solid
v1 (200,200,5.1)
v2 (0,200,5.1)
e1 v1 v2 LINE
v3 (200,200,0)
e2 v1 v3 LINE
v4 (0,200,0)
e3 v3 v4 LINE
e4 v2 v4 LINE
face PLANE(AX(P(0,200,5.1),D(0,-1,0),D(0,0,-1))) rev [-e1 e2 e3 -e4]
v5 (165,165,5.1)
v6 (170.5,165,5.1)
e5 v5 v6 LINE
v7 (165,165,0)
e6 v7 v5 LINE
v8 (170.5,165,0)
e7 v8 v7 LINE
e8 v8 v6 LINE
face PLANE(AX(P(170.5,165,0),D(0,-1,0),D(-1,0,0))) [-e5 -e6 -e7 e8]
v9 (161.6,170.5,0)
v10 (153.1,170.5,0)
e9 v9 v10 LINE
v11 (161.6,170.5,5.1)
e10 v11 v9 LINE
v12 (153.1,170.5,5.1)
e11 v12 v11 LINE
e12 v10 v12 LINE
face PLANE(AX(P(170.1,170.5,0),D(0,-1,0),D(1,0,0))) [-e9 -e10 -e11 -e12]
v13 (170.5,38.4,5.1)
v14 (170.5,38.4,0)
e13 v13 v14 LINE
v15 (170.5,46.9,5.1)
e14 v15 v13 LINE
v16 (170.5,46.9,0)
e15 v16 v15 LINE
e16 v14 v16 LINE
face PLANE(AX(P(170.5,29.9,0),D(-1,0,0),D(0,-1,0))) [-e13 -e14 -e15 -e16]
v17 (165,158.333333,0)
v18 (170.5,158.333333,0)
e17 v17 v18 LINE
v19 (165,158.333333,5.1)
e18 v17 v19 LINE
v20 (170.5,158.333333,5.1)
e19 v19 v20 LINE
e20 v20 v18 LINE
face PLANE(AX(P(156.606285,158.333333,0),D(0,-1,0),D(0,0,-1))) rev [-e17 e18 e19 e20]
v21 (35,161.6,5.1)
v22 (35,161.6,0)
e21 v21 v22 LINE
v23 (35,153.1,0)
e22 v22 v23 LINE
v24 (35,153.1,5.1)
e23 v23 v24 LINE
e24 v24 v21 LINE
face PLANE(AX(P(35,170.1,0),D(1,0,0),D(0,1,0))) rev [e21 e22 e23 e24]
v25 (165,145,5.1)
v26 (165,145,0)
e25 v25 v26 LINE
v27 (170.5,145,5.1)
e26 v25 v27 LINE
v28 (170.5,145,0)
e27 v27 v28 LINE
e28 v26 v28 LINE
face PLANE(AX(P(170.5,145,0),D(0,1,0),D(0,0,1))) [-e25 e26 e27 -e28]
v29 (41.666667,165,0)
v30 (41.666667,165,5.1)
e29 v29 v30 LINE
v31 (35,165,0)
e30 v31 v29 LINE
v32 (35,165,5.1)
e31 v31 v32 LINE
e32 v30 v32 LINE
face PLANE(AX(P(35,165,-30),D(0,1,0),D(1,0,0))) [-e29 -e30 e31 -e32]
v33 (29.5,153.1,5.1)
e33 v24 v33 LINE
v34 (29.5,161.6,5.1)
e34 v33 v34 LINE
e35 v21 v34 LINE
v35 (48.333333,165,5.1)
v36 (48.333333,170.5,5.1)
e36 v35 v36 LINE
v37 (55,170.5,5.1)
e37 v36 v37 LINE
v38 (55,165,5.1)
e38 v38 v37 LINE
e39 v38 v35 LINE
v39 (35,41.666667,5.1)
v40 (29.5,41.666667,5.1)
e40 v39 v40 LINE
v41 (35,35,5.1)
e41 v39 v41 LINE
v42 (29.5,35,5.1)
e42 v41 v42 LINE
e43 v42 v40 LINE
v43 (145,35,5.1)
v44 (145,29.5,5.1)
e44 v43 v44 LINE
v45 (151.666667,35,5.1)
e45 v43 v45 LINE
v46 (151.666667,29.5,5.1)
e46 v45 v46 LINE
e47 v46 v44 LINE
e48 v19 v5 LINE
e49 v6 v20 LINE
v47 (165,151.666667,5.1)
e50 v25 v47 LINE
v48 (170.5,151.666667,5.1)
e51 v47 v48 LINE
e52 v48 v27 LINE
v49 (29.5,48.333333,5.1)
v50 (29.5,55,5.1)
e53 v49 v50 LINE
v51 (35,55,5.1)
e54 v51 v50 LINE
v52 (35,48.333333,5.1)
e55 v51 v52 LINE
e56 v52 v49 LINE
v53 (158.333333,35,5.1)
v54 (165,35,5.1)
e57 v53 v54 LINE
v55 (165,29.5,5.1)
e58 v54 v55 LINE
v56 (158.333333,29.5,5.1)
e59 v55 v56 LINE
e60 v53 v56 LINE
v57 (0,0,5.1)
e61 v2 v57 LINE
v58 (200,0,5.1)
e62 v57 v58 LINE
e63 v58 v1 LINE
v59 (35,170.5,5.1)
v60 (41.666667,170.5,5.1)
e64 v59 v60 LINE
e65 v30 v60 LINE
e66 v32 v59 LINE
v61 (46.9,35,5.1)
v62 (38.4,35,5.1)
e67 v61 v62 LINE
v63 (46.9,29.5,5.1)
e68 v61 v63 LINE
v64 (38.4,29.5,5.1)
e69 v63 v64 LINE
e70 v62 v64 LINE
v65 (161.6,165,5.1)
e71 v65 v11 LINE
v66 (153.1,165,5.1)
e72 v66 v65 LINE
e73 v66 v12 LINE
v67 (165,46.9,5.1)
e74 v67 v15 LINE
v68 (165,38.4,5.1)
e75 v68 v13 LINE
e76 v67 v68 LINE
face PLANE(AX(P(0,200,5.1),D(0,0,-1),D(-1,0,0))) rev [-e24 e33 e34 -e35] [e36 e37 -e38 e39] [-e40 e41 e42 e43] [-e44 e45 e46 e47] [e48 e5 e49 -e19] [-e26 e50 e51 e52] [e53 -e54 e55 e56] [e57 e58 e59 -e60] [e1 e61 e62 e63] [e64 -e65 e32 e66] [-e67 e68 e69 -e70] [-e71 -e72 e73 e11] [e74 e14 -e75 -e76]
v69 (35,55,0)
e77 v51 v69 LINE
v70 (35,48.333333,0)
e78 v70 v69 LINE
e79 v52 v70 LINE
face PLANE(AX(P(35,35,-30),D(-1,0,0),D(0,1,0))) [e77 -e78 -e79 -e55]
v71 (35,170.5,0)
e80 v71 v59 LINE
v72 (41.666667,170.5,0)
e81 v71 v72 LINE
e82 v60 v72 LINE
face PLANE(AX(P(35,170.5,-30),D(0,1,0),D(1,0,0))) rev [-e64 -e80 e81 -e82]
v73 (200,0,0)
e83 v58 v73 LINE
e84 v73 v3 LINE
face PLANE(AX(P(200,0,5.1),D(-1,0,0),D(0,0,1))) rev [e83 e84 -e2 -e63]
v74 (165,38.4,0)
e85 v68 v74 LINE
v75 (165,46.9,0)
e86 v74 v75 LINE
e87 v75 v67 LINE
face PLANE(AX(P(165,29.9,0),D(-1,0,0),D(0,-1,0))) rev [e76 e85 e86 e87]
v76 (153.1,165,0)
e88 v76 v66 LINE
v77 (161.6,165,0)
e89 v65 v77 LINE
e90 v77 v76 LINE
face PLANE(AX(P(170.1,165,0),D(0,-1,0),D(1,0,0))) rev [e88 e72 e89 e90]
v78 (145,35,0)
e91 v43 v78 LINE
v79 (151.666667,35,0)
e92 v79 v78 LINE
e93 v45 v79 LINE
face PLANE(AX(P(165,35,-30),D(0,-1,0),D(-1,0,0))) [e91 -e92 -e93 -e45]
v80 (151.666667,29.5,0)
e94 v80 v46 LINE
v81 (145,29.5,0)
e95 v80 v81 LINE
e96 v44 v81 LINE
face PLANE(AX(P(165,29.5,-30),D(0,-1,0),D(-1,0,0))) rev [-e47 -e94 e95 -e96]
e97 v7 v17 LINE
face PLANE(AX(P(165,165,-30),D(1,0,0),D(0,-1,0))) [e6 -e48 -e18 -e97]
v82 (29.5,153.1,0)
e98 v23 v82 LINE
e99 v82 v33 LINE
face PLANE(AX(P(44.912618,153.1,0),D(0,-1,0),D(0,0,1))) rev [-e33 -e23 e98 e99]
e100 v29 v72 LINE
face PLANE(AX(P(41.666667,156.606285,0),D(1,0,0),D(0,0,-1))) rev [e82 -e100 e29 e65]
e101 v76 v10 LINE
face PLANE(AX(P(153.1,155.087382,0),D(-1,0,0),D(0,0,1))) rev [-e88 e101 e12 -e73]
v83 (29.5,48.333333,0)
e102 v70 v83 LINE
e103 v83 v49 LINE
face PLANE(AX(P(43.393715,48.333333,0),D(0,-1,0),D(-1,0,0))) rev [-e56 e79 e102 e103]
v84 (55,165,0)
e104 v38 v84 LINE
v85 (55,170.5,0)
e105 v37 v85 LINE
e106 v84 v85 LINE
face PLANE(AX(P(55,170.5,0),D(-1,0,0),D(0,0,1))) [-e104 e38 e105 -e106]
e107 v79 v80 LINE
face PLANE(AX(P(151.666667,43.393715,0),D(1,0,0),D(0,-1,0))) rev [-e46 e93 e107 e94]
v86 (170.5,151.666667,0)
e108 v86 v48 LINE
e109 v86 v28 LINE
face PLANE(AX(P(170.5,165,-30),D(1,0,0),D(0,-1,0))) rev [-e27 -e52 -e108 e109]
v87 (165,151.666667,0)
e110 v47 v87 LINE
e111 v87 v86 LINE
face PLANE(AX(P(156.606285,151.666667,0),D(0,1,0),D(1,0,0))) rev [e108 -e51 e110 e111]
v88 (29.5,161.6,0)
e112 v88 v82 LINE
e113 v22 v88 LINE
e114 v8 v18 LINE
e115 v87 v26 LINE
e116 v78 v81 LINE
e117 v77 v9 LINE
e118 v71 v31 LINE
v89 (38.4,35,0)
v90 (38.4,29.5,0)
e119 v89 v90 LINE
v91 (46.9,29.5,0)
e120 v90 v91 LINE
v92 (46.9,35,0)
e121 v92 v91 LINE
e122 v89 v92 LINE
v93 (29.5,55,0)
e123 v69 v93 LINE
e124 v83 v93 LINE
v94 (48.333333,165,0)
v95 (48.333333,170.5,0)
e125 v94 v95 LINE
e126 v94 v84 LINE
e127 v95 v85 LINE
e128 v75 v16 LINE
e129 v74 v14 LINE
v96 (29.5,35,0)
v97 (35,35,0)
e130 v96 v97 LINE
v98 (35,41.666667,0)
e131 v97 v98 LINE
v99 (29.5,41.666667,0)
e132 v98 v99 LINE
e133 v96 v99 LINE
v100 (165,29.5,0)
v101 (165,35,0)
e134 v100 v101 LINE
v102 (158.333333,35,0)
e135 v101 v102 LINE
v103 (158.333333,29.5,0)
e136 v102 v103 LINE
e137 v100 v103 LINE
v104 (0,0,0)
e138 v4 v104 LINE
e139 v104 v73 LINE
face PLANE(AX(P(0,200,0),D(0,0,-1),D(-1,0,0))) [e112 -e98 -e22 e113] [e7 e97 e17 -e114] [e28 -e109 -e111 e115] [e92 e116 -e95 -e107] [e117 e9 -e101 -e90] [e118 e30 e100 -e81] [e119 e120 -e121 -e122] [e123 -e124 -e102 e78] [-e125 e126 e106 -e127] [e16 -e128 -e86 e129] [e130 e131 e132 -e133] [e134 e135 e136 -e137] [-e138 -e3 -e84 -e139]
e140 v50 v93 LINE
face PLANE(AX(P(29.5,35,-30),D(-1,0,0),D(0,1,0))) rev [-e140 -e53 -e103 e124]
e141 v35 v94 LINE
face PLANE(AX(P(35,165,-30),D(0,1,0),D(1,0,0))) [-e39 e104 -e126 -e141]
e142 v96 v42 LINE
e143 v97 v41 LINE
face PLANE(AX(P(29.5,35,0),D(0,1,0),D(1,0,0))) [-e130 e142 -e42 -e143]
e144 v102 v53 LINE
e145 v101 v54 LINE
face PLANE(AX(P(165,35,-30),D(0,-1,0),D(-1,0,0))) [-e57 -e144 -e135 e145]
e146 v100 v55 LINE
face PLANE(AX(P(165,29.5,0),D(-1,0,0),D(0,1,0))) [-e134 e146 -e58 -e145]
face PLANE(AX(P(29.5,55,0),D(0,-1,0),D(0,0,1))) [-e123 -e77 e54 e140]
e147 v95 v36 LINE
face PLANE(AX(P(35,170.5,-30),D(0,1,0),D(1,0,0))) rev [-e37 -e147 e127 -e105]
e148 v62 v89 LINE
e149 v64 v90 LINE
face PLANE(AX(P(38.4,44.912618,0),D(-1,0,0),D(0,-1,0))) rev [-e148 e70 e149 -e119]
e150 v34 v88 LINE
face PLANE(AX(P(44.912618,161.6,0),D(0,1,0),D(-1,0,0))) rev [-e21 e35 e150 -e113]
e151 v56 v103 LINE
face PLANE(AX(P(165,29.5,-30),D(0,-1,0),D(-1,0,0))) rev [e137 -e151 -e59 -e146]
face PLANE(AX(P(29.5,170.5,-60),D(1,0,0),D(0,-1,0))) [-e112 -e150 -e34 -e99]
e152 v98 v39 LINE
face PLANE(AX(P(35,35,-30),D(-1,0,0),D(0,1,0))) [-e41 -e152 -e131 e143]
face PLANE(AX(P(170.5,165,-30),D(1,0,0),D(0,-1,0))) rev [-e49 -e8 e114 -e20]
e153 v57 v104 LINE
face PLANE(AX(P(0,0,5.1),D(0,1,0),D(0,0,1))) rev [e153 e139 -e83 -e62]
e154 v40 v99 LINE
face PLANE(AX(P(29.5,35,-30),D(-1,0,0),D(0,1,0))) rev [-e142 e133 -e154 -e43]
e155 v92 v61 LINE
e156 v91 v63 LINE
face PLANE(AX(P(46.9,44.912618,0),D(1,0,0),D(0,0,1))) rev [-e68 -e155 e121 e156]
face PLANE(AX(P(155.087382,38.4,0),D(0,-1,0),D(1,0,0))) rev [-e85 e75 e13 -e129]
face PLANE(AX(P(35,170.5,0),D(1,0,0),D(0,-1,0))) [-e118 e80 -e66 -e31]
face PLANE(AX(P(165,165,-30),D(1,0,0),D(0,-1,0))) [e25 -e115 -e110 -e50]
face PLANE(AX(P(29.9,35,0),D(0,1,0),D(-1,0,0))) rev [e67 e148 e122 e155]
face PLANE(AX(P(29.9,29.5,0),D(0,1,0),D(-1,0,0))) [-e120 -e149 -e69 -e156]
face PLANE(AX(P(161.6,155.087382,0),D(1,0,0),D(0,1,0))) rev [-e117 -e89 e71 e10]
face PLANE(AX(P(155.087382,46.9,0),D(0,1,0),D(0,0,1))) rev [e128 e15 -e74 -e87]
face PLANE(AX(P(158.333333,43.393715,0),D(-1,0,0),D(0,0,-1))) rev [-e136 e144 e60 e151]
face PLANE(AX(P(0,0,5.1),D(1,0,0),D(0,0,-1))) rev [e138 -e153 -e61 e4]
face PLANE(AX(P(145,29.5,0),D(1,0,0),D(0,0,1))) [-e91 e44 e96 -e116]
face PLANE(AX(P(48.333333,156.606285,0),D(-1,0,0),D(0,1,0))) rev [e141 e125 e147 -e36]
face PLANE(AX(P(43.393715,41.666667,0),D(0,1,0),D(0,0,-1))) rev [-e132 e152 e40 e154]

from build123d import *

# Parameters (mm, degrees)
SKETCH1_W             = 200
SKETCH1_H             = 200
BOSS_EXTRUDE1_DEPTH   = 5.1
CAVITY1_START         = 29.5
CAVITY1_OUTLINE_W     = 6.666666667
CAVITY1_OUTLINE_H     = 5.1
CAVITY1_OUTLINE_W_2   = 8.5
CAVITY1_DEPTH         = 5.5
CAVITY1_START_2       = 165
CAVITY1_2_OUTLINE_W   = 8.5
CAVITY1_2_OUTLINE_H   = 5.1
CAVITY1_2_OUTLINE_W_2 = 6.666666667
CAVITY1_2_DEPTH       = 5.5
CAVITY1_START_3       = 38.4
CAVITY1_3_OUTLINE_W   = 5.5
CAVITY1_3_OUTLINE_H   = 5.1
CAVITY1_3_DEPTH       = 8.5
CAVITY1_START_4       = 153.1
CAVITY1_4_OUTLINE_W   = 5.5
CAVITY1_4_OUTLINE_H   = 5.1
CAVITY1_4_DEPTH       = 8.5
CAVITY1_START_5       = 35
CAVITY1_5_OUTLINE_W   = 5.5
CAVITY1_5_OUTLINE_H   = 5.1
CAVITY1_5_DEPTH       = 6.666666667
CAVITY1_START_6       = 48.333333333
CAVITY1_6_OUTLINE_W   = 5.5
CAVITY1_6_OUTLINE_H   = 5.1
CAVITY1_6_DEPTH       = 6.666666667
CAVITY1_START_7       = 145
CAVITY1_7_OUTLINE_W   = 5.5
CAVITY1_7_OUTLINE_H   = 5.1
CAVITY1_7_DEPTH       = 6.666666667
CAVITY1_START_8       = 158.333333333
CAVITY1_8_OUTLINE_W   = 5.5
CAVITY1_8_OUTLINE_H   = 5.1
CAVITY1_8_DEPTH       = 6.666666667


# Read off the part's stored shape, not the designer's step: Cavity1
with BuildPart() as part:
    # Sketch1 → Boss-Extrude1 (new body)
    with BuildSketch(Plane.XY):
        with Locations((100, 100)):
            Rectangle(SKETCH1_W, SKETCH1_H)
    extrude(amount=BOSS_EXTRUDE1_DEPTH)

    # Cavity1 outline → Cavity1 (cut)
    with BuildSketch(Plane(origin=(0, 0, 0), x_dir=(1, 0, 0), z_dir=(0, 1, 0)).offset(CAVITY1_START)):
        with Locations((161.666666667, -2.55)):
            Rectangle(CAVITY1_OUTLINE_W, CAVITY1_OUTLINE_H)
        with Locations((148.333333334, -2.55)):
            Rectangle(CAVITY1_OUTLINE_W, CAVITY1_OUTLINE_H)
        with Locations((42.65, -2.55)):
            Rectangle(CAVITY1_OUTLINE_W_2, CAVITY1_OUTLINE_H)
    extrude(amount=CAVITY1_DEPTH, mode=Mode.SUBTRACT)

    # Cavity1 2 outline → Cavity1 2 (cut)
    with BuildSketch(Plane(origin=(0, 0, 0), x_dir=(1, 0, 0), z_dir=(0, 1, 0)).offset(CAVITY1_START_2)):
        with Locations((157.35, -2.55)):
            Rectangle(CAVITY1_2_OUTLINE_W, CAVITY1_2_OUTLINE_H)
        with Locations((51.666666667, -2.55)):
            Rectangle(CAVITY1_2_OUTLINE_W_2, CAVITY1_2_OUTLINE_H)
        with Locations((38.333333334, -2.55)):
            Rectangle(CAVITY1_2_OUTLINE_W_2, CAVITY1_2_OUTLINE_H)
    extrude(amount=CAVITY1_2_DEPTH, mode=Mode.SUBTRACT)

    # Cavity1 3 outline → Cavity1 3 (cut)
    with BuildSketch(Plane(origin=(0, 0, 0), x_dir=(1, 0, 0), z_dir=(0, 1, 0)).offset(CAVITY1_START_3)):
        with Locations((167.75, -2.55)):
            Rectangle(CAVITY1_3_OUTLINE_W, CAVITY1_3_OUTLINE_H)
    extrude(amount=CAVITY1_3_DEPTH, mode=Mode.SUBTRACT)

    # Cavity1 4 outline → Cavity1 4 (cut)
    with BuildSketch(Plane(origin=(0, 0, 0), x_dir=(1, 0, 0), z_dir=(0, 1, 0)).offset(CAVITY1_START_4)):
        with Locations((32.25, -2.55)):
            Rectangle(CAVITY1_4_OUTLINE_W, CAVITY1_4_OUTLINE_H)
    extrude(amount=CAVITY1_4_DEPTH, mode=Mode.SUBTRACT)

    # Cavity1 5 outline → Cavity1 5 (cut)
    with BuildSketch(Plane(origin=(0, 0, 0), x_dir=(1, 0, 0), z_dir=(0, 1, 0)).offset(CAVITY1_START_5)):
        with Locations((32.25, -2.55)):
            Rectangle(CAVITY1_5_OUTLINE_W, CAVITY1_5_OUTLINE_H)
    extrude(amount=CAVITY1_5_DEPTH, mode=Mode.SUBTRACT)

    # Cavity1 6 outline → Cavity1 6 (cut)
    with BuildSketch(Plane(origin=(0, 0, 0), x_dir=(1, 0, 0), z_dir=(0, 1, 0)).offset(CAVITY1_START_6)):
        with Locations((32.25, -2.55)):
            Rectangle(CAVITY1_6_OUTLINE_W, CAVITY1_6_OUTLINE_H)
    extrude(amount=CAVITY1_6_DEPTH, mode=Mode.SUBTRACT)

    # Cavity1 7 outline → Cavity1 7 (cut)
    with BuildSketch(Plane(origin=(0, 0, 0), x_dir=(1, 0, 0), z_dir=(0, 1, 0)).offset(CAVITY1_START_7)):
        with Locations((167.75, -2.55)):
            Rectangle(CAVITY1_7_OUTLINE_W, CAVITY1_7_OUTLINE_H)
    extrude(amount=CAVITY1_7_DEPTH, mode=Mode.SUBTRACT)

    # Cavity1 8 outline → Cavity1 8 (cut)
    with BuildSketch(Plane(origin=(0, 0, 0), x_dir=(1, 0, 0), z_dir=(0, 1, 0)).offset(CAVITY1_START_8)):
        with Locations((167.75, -2.55)):
            Rectangle(CAVITY1_8_OUTLINE_W, CAVITY1_8_OUTLINE_H)
    extrude(amount=CAVITY1_8_DEPTH, mode=Mode.SUBTRACT)


solid = part.part
